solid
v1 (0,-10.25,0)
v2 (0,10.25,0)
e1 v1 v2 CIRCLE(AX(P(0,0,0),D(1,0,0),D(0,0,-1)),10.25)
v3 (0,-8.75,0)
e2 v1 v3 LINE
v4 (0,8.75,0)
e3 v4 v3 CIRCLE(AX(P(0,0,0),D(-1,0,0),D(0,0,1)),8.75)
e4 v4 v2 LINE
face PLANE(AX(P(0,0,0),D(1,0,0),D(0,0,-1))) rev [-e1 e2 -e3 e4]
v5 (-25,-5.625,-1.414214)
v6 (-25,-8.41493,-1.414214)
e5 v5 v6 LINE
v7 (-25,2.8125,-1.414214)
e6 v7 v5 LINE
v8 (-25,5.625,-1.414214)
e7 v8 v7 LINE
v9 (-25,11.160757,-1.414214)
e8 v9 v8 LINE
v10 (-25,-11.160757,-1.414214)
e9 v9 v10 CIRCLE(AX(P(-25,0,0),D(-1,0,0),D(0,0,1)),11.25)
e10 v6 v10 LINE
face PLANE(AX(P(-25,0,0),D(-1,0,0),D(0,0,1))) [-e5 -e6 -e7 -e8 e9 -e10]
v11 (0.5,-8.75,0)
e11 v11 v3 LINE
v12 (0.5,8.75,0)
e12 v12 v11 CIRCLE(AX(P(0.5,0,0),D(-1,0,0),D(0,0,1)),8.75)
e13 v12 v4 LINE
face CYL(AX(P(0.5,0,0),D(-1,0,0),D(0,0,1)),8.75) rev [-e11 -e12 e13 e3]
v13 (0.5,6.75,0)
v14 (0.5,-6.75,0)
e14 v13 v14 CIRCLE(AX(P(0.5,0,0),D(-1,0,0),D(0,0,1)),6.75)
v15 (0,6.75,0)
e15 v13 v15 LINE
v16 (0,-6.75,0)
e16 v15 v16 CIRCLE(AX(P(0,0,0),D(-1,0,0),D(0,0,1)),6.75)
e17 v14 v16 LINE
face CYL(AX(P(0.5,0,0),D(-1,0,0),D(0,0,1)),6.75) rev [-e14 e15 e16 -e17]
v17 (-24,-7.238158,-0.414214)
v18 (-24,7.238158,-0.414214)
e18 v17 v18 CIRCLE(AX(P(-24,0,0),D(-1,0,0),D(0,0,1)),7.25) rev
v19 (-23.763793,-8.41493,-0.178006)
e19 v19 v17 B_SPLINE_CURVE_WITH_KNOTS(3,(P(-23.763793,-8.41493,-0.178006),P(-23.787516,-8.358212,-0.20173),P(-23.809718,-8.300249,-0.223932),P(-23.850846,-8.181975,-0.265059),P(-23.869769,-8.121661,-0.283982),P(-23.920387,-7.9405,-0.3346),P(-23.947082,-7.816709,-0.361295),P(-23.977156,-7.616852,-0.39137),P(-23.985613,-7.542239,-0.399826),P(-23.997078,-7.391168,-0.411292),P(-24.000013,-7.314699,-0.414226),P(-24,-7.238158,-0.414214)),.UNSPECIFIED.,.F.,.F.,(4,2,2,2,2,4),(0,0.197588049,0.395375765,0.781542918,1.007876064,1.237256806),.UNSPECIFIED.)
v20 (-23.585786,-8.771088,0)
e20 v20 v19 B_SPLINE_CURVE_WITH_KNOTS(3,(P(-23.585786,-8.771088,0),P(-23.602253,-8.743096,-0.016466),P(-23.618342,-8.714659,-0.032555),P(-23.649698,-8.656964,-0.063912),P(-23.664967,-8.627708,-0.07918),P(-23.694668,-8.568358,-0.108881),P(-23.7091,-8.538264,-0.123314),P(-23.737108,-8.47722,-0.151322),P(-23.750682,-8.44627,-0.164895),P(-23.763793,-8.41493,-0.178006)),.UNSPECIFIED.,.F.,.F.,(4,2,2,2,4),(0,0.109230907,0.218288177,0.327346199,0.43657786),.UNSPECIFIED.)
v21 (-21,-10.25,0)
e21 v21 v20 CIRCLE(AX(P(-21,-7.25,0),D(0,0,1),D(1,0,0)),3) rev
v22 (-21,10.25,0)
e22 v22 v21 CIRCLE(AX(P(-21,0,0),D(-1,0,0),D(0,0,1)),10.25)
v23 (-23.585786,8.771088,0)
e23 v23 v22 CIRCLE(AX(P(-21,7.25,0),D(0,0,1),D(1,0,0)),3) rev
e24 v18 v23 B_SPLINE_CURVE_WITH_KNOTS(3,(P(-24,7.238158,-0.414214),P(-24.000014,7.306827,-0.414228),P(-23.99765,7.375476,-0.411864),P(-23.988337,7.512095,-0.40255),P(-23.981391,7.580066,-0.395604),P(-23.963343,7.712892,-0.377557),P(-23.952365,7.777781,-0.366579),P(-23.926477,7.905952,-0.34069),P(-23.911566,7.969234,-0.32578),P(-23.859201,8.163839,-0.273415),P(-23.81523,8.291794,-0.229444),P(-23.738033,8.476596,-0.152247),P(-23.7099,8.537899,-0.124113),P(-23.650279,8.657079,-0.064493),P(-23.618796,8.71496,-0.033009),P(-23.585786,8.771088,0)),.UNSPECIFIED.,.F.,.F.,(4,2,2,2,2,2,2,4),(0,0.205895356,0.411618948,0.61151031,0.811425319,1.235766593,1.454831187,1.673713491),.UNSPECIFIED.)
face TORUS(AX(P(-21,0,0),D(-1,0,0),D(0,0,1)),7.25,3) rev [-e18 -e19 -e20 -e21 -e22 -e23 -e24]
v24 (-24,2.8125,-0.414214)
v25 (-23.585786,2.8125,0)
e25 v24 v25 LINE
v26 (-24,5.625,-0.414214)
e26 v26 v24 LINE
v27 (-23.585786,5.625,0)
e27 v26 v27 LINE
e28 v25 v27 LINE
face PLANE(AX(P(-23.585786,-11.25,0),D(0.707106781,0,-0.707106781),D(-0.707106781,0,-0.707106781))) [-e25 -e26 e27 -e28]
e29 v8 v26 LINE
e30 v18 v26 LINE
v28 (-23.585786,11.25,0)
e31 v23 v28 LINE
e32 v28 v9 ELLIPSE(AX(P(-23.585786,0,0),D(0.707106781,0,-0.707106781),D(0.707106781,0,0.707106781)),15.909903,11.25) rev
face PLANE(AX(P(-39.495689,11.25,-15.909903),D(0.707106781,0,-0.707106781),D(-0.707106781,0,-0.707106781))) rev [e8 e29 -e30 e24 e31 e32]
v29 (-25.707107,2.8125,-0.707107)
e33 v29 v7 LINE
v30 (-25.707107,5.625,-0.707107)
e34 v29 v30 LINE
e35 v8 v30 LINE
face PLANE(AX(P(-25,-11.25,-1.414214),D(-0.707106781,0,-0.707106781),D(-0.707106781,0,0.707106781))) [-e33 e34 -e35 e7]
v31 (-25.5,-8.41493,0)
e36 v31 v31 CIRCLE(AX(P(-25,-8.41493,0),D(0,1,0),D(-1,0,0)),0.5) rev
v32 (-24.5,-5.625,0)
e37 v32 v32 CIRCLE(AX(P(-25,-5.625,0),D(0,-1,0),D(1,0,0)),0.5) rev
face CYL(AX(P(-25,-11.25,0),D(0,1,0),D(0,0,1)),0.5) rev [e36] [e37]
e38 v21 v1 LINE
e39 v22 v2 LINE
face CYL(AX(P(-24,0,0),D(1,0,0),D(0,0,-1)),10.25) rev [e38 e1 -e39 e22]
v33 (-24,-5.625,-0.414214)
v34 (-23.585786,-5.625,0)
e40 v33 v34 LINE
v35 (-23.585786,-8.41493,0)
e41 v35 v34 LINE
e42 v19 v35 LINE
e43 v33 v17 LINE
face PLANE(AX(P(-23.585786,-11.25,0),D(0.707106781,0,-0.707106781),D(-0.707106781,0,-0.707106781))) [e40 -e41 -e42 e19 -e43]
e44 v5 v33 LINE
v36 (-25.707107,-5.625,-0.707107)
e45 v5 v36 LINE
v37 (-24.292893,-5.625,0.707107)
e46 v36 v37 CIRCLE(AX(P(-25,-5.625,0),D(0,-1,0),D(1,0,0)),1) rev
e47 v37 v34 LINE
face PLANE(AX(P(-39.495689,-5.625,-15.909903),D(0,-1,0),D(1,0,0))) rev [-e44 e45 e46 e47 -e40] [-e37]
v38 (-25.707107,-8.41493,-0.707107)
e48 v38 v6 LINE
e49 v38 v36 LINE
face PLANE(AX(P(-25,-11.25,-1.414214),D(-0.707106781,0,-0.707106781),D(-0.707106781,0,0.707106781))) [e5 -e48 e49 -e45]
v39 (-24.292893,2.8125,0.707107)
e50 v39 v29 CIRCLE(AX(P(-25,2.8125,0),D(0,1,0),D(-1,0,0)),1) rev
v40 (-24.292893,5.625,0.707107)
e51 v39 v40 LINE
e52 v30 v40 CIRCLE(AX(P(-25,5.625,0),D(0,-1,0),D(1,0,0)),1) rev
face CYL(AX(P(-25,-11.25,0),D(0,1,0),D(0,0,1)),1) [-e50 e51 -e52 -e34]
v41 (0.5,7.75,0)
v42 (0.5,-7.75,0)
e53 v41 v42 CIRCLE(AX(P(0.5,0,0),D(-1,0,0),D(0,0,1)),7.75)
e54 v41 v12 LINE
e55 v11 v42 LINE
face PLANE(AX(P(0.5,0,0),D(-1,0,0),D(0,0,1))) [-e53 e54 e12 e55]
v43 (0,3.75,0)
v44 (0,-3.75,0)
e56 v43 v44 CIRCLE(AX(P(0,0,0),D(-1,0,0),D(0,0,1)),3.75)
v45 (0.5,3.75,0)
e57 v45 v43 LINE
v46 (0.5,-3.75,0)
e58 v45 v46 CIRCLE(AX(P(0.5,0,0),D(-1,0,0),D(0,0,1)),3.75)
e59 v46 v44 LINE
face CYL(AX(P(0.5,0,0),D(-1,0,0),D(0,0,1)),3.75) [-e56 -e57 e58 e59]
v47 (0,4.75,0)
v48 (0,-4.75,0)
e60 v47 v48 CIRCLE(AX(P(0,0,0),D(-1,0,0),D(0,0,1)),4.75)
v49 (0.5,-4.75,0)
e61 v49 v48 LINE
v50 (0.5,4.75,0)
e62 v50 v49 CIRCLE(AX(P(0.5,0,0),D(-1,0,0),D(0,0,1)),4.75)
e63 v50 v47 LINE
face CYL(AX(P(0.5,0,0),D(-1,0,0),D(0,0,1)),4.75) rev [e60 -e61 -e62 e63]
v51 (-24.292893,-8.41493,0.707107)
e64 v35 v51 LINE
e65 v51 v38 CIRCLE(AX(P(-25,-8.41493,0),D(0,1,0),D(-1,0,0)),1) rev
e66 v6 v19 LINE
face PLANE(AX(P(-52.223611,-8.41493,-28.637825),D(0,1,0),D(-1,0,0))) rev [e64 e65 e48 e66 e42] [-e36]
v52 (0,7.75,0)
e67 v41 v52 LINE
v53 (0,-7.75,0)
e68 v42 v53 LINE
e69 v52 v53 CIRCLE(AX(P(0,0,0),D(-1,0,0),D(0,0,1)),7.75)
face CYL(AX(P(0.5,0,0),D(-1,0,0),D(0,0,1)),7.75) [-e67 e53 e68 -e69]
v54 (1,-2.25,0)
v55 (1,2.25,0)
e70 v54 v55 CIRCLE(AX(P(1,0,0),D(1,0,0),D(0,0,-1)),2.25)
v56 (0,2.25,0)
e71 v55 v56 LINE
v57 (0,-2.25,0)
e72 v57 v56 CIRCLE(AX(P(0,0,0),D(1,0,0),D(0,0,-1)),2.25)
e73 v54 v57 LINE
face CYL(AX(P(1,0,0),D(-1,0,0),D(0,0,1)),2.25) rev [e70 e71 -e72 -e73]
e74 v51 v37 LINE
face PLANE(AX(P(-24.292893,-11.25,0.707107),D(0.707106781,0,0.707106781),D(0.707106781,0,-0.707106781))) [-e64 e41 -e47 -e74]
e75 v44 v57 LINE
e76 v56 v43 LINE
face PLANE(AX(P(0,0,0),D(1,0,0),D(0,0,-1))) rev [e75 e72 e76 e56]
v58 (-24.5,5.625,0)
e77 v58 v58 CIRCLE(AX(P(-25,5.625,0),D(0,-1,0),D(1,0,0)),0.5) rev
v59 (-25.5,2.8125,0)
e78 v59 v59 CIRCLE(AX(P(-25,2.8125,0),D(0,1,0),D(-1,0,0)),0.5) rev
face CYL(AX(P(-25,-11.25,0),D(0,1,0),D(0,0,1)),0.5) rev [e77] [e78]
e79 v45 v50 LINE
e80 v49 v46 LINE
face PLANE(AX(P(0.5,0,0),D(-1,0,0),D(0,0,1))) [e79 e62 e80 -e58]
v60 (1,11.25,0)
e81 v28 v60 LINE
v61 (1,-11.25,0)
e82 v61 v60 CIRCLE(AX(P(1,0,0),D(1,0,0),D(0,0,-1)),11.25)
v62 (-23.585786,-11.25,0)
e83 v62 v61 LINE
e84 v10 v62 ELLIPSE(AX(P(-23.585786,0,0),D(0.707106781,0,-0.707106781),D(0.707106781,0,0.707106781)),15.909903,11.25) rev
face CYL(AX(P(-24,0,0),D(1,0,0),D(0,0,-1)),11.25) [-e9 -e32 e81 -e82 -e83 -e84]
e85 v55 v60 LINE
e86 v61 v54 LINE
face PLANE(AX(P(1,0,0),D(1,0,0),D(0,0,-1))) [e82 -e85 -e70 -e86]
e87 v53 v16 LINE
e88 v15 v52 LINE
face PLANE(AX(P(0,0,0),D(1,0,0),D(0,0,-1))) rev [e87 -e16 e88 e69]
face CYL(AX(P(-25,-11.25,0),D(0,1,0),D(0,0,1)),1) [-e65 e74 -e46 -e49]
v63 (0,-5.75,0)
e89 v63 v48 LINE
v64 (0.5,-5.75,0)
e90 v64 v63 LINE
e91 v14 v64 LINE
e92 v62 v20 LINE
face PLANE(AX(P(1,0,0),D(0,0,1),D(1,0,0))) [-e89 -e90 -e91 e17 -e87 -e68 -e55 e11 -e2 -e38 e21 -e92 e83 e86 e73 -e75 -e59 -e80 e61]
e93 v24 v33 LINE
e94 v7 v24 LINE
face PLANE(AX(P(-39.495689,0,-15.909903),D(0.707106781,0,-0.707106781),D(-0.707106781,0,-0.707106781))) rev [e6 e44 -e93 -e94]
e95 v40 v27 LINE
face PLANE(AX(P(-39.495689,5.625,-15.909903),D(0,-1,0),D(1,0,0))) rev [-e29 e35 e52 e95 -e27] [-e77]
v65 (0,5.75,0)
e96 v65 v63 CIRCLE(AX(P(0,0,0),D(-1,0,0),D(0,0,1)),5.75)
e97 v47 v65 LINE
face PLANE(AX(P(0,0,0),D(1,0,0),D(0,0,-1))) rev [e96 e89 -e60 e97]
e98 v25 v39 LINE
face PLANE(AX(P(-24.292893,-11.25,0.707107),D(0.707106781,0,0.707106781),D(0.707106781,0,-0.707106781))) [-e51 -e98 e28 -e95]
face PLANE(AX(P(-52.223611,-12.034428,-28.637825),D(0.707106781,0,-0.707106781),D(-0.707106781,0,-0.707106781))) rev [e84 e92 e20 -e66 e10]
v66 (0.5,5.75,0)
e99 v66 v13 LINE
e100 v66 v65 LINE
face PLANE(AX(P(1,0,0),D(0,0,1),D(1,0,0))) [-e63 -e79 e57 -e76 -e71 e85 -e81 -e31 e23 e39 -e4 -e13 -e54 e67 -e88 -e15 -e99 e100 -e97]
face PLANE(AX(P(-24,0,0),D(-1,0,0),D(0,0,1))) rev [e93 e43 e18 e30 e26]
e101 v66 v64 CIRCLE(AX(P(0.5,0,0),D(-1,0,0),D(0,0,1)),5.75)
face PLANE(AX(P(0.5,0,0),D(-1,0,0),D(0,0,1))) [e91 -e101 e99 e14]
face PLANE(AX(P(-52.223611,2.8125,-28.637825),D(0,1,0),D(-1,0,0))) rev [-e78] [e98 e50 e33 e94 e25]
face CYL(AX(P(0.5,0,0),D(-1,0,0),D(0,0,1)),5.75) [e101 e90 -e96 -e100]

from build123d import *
from build123d.topology import SkipClean

# Parameters (mm, degrees)
BOSS_EXTRUDE1_DEPTH = 1
CUT_EXTRUDE1_DEPTH  = 0.5
BOSS_EXTRUDE2_START = -25
BOSS_EXTRUDE2_DEPTH = 25
BOSS_EXTRUDE3_START = 1
BOSS_EXTRUDE3_DEPTH = 1
SKETCH7_R           = 0.5
BOSS_EXTRUDE4_DEPTH = 22.5
SKETCH10_R          = 0.5
CUT_EXTRUDE4_DEPTH  = 40.5
SKETCH8_W           = 10.868003522
SKETCH8_H           = 5.625
CUT_EXTRUDE2_DEPTH  = 22.5
LPATTERN1_COUNT     = 2
LPATTERN1_PITCH     = 11.25
CUT_EXTRUDE3_START  = -40.5
SKETCH9_R           = 20.473718745
SKETCH9_R_2         = 11.25
CUT_EXTRUDE3_DEPTH  = 40.5
SKETCH11_W          = 6.72531589
SKETCH11_H          = 3.584111804
SKETCH11_W_2        = 7.229090256
SKETCH11_H_2        = 3.619498095
CUT_EXTRUDE5_DEPTH  = 40.5
FILLET1_R           = 3


with BuildPart() as part:
    # Sketch1 → Boss-Extrude1 (new body)
    with BuildSketch(Plane(origin=(0, 0, 0), x_dir=(0, 0, -1), z_dir=(1, 0, 0))):
        with BuildLine():
            Line((0, -2.25), (0, -10.25))
            ThreePointArc((0, -10.25), (10.25, 0), (0, 10.25))
            Line((0, 10.25), (0, 2.25))
            ThreePointArc((0, 2.25), (1.590990258, 1.590990258), (2.25, 0))
            ThreePointArc((2.25, 0), (1.590990258, -1.590990258), (0, -2.25))
        make_face()
    extrude(amount=BOSS_EXTRUDE1_DEPTH)

    # Sketch2 → Cut-Extrude1 (cut)
    with BuildSketch(Plane.ZY):
        with BuildLine():
            ThreePointArc((0, 3.75), (2.651650429, 2.651650429), (3.75, 0))
            ThreePointArc((3.75, 0), (2.651650429, -2.651650429), (0, -3.75))
            Line((0, -3.75), (0, -4.75))
            ThreePointArc((0, -4.75), (3.358757211, -3.358757211), (4.75, 0))
            ThreePointArc((4.75, 0), (3.358757211, 3.358757211), (0, 4.75))
            Line((0, 4.75), (0, 3.75))
        make_face()
        with BuildLine():
            ThreePointArc((0, -3.75), (-3.75, 0), (0, 3.75))
            Line((0, 3.75), (0, 4.75))
            ThreePointArc((0, 4.75), (-4.75, 0), (0, -4.75))
            Line((0, -4.75), (0, -3.75))
        make_face()
        with BuildLine():
            Line((0, 6.75), (0, 5.75))
            ThreePointArc((0, 5.75), (4.065863992, 4.065863992), (5.75, 0))
            ThreePointArc((5.75, 0), (4.065863992, -4.065863992), (0, -5.75))
            Line((0, -5.75), (0, -6.75))
            ThreePointArc((0, -6.75), (4.772970773, -4.772970773), (6.75, 0))
            ThreePointArc((6.75, 0), (4.772970773, 4.772970773), (0, 6.75))
        make_face()
        with BuildLine():
            ThreePointArc((0, -5.75), (-5.75, 0), (0, 5.75))
            Line((0, 5.75), (0, 6.75))
            ThreePointArc((0, 6.75), (-6.75, 0), (0, -6.75))
            Line((0, -6.75), (0, -5.75))
        make_face()
        with BuildLine():
            Line((0, 8.75), (0, 7.75))
            ThreePointArc((0, 7.75), (5.480077554, 5.480077554), (7.75, 0))
            ThreePointArc((7.75, 0), (5.480077554, -5.480077554), (0, -7.75))
            Line((0, -7.75), (0, -8.75))
            ThreePointArc((0, -8.75), (6.187184335, -6.187184335), (8.75, 0))
            ThreePointArc((8.75, 0), (6.187184335, 6.187184335), (0, 8.75))
        make_face()
        with BuildLine():
            ThreePointArc((0, -7.75), (-7.75, 0), (0, 7.75))
            Line((0, 7.75), (0, 8.75))
            ThreePointArc((0, 8.75), (-8.75, 0), (0, -8.75))
            Line((0, -8.75), (0, -7.75))
        make_face()
    extrude(amount=-CUT_EXTRUDE1_DEPTH, mode=Mode.SUBTRACT)

    # Sketch3 → Boss-Extrude2 (add)
    with BuildSketch(Plane(origin=(1, 0, 0), x_dir=(0, 0, -1), z_dir=(1, 0, 0)).offset(BOSS_EXTRUDE2_START)):
        with BuildLine():
            Line((0, -10.25), (0, -11.25))
            ThreePointArc((0, -11.25), (11.25, 0), (0, 11.25))
            Line((0, 11.25), (0, 10.25))
            ThreePointArc((0, 10.25), (10.25, 0), (0, -10.25))
        make_face()
    extrude(amount=BOSS_EXTRUDE2_DEPTH)

    # Sketch6 → Boss-Extrude3 (add)
    with BuildSketch(Plane.ZY.offset(24).offset(BOSS_EXTRUDE3_START)):
        with BuildLine():
            Line((0, 11.25), (0, -11.25))
            ThreePointArc((0, -11.25), (-11.25, 0), (0, 11.25))
        make_face()
    extrude(amount=-BOSS_EXTRUDE3_DEPTH)

    # Sketch7 → Boss-Extrude4 (add)
    with SkipClean():  # the faces are left unmerged after this step: merging them gives an invalid solid
        with BuildSketch(Plane(origin=(0, 11.25, 0), x_dir=(1, 0, 0), z_dir=(0, 1, 0))):
            with BuildLine():
                Line((-23.585786438, 0), (-25, 1.414213562))
                Line((-25, 1.414213562), (-25.707106781, 0.707106781))
                ThreePointArc((-25.707106781, 0.707106781), (-25.707106781, -0.707106781), (-24.292893219, -0.707106781))
                Line((-24.292893219, -0.707106781), (-23.585786438, 0))
            make_face()
            with Locations(Location((-25, 0, 0), (0, 0, 270))):
                Circle(SKETCH7_R, mode=Mode.SUBTRACT)
        extrude(amount=-BOSS_EXTRUDE4_DEPTH)

    # Sketch10 → Cut-Extrude4 (cut)
    with BuildSketch(Plane(origin=(0, 11.25, 0), x_dir=(1, 0, 0), z_dir=(0, 1, 0))):
        with Locations(Location((-25, 0, 0), (0, 0, 270))):
            Circle(SKETCH10_R)
    extrude(amount=-CUT_EXTRUDE4_DEPTH, mode=Mode.SUBTRACT)

    # Sketch8 → Cut-Extrude2 (cut)
    with BuildSketch(Plane(origin=(-11.792893219, 0, -11.792893219), x_dir=(0.7071067811865439, 0, -0.7071067811865511), z_dir=(0.7071067811865511, 0, 0.7071067811865439))):
        with Locations((-22.111671291, 8.4375)):
            Rectangle(SKETCH8_W, SKETCH8_H)
    cut_extrude2 = extrude(amount=-CUT_EXTRUDE2_DEPTH, mode=Mode.SUBTRACT)

    # LPattern1: Cut-Extrude2 ×2
    with Locations(*[(0, -i * LPATTERN1_PITCH, 0) for i in range(1, LPATTERN1_COUNT)]):
        add(cut_extrude2, mode=Mode.SUBTRACT)

    # Sketch9 → Cut-Extrude3 (cut)
    with BuildSketch(Plane(origin=(1, 0, 0), x_dir=(0, 0, -1), z_dir=(1, 0, 0)).offset(CUT_EXTRUDE3_START)):
        Circle(SKETCH9_R)
        Circle(SKETCH9_R_2, mode=Mode.SUBTRACT)
    extrude(amount=CUT_EXTRUDE3_DEPTH, mode=Mode.SUBTRACT)

    # Sketch11 → Cut-Extrude5 (cut)
    with BuildSketch(Plane(origin=(-11.792893219, 0, -11.792893219), x_dir=(0.7071067811865434, 0, -0.7071067811865517), z_dir=(0.7071067811865517, 0, 0.7071067811865434))):
        with Locations((-20.040327475, 1.020444098)):
            Rectangle(SKETCH11_W, SKETCH11_H)
        with Locations((-20.292214658, -10.224678683)):
            Rectangle(SKETCH11_W_2, SKETCH11_H_2)
    extrude(amount=-CUT_EXTRUDE5_DEPTH, mode=Mode.SUBTRACT)

    # Fillet1
    # the kernel refuses this fillet: 3 mm, written as the material it adds along each edge
    with BuildSketch(Plane(origin=(-24, 0, 0), x_dir=(0, 0.7697147606602491, 0.6383879598032339), z_dir=(0, -0.6383879598032339, 0.7697147606602491))) as fillet1_piece_1_section:
        with BuildLine():
            CenterArc((10.25 - FILLET1_R, -FILLET1_R), FILLET1_R, 0, 90)
            Line((10.25 - FILLET1_R, 0), (10.25, 0))
            Line((10.25, 0), (10.25, -FILLET1_R))
        make_face()
    fillet1_piece_1 = revolve(axis=Axis((-24, 0, 0), (-1, 0, 0)), revolution_arc=259.343436967, mode=Mode.PRIVATE)
    fillet1_piece_1 = split(fillet1_piece_1, bisect_by=Plane(origin=(-23.150246859, 0, 0), z_dir=(0, 0, -1)), keep=Keep.TOP, mode=Mode.PRIVATE)
    fillet1_piece_1 = split(fillet1_piece_1, bisect_by=Plane(origin=(-28.068140078, 0, -4.482353641), z_dir=(0.7071067811865434, 0, -0.7071067811865517)), keep=Keep.TOP, mode=Mode.PRIVATE)
    add(fillet1_piece_1)


solid = part.part
